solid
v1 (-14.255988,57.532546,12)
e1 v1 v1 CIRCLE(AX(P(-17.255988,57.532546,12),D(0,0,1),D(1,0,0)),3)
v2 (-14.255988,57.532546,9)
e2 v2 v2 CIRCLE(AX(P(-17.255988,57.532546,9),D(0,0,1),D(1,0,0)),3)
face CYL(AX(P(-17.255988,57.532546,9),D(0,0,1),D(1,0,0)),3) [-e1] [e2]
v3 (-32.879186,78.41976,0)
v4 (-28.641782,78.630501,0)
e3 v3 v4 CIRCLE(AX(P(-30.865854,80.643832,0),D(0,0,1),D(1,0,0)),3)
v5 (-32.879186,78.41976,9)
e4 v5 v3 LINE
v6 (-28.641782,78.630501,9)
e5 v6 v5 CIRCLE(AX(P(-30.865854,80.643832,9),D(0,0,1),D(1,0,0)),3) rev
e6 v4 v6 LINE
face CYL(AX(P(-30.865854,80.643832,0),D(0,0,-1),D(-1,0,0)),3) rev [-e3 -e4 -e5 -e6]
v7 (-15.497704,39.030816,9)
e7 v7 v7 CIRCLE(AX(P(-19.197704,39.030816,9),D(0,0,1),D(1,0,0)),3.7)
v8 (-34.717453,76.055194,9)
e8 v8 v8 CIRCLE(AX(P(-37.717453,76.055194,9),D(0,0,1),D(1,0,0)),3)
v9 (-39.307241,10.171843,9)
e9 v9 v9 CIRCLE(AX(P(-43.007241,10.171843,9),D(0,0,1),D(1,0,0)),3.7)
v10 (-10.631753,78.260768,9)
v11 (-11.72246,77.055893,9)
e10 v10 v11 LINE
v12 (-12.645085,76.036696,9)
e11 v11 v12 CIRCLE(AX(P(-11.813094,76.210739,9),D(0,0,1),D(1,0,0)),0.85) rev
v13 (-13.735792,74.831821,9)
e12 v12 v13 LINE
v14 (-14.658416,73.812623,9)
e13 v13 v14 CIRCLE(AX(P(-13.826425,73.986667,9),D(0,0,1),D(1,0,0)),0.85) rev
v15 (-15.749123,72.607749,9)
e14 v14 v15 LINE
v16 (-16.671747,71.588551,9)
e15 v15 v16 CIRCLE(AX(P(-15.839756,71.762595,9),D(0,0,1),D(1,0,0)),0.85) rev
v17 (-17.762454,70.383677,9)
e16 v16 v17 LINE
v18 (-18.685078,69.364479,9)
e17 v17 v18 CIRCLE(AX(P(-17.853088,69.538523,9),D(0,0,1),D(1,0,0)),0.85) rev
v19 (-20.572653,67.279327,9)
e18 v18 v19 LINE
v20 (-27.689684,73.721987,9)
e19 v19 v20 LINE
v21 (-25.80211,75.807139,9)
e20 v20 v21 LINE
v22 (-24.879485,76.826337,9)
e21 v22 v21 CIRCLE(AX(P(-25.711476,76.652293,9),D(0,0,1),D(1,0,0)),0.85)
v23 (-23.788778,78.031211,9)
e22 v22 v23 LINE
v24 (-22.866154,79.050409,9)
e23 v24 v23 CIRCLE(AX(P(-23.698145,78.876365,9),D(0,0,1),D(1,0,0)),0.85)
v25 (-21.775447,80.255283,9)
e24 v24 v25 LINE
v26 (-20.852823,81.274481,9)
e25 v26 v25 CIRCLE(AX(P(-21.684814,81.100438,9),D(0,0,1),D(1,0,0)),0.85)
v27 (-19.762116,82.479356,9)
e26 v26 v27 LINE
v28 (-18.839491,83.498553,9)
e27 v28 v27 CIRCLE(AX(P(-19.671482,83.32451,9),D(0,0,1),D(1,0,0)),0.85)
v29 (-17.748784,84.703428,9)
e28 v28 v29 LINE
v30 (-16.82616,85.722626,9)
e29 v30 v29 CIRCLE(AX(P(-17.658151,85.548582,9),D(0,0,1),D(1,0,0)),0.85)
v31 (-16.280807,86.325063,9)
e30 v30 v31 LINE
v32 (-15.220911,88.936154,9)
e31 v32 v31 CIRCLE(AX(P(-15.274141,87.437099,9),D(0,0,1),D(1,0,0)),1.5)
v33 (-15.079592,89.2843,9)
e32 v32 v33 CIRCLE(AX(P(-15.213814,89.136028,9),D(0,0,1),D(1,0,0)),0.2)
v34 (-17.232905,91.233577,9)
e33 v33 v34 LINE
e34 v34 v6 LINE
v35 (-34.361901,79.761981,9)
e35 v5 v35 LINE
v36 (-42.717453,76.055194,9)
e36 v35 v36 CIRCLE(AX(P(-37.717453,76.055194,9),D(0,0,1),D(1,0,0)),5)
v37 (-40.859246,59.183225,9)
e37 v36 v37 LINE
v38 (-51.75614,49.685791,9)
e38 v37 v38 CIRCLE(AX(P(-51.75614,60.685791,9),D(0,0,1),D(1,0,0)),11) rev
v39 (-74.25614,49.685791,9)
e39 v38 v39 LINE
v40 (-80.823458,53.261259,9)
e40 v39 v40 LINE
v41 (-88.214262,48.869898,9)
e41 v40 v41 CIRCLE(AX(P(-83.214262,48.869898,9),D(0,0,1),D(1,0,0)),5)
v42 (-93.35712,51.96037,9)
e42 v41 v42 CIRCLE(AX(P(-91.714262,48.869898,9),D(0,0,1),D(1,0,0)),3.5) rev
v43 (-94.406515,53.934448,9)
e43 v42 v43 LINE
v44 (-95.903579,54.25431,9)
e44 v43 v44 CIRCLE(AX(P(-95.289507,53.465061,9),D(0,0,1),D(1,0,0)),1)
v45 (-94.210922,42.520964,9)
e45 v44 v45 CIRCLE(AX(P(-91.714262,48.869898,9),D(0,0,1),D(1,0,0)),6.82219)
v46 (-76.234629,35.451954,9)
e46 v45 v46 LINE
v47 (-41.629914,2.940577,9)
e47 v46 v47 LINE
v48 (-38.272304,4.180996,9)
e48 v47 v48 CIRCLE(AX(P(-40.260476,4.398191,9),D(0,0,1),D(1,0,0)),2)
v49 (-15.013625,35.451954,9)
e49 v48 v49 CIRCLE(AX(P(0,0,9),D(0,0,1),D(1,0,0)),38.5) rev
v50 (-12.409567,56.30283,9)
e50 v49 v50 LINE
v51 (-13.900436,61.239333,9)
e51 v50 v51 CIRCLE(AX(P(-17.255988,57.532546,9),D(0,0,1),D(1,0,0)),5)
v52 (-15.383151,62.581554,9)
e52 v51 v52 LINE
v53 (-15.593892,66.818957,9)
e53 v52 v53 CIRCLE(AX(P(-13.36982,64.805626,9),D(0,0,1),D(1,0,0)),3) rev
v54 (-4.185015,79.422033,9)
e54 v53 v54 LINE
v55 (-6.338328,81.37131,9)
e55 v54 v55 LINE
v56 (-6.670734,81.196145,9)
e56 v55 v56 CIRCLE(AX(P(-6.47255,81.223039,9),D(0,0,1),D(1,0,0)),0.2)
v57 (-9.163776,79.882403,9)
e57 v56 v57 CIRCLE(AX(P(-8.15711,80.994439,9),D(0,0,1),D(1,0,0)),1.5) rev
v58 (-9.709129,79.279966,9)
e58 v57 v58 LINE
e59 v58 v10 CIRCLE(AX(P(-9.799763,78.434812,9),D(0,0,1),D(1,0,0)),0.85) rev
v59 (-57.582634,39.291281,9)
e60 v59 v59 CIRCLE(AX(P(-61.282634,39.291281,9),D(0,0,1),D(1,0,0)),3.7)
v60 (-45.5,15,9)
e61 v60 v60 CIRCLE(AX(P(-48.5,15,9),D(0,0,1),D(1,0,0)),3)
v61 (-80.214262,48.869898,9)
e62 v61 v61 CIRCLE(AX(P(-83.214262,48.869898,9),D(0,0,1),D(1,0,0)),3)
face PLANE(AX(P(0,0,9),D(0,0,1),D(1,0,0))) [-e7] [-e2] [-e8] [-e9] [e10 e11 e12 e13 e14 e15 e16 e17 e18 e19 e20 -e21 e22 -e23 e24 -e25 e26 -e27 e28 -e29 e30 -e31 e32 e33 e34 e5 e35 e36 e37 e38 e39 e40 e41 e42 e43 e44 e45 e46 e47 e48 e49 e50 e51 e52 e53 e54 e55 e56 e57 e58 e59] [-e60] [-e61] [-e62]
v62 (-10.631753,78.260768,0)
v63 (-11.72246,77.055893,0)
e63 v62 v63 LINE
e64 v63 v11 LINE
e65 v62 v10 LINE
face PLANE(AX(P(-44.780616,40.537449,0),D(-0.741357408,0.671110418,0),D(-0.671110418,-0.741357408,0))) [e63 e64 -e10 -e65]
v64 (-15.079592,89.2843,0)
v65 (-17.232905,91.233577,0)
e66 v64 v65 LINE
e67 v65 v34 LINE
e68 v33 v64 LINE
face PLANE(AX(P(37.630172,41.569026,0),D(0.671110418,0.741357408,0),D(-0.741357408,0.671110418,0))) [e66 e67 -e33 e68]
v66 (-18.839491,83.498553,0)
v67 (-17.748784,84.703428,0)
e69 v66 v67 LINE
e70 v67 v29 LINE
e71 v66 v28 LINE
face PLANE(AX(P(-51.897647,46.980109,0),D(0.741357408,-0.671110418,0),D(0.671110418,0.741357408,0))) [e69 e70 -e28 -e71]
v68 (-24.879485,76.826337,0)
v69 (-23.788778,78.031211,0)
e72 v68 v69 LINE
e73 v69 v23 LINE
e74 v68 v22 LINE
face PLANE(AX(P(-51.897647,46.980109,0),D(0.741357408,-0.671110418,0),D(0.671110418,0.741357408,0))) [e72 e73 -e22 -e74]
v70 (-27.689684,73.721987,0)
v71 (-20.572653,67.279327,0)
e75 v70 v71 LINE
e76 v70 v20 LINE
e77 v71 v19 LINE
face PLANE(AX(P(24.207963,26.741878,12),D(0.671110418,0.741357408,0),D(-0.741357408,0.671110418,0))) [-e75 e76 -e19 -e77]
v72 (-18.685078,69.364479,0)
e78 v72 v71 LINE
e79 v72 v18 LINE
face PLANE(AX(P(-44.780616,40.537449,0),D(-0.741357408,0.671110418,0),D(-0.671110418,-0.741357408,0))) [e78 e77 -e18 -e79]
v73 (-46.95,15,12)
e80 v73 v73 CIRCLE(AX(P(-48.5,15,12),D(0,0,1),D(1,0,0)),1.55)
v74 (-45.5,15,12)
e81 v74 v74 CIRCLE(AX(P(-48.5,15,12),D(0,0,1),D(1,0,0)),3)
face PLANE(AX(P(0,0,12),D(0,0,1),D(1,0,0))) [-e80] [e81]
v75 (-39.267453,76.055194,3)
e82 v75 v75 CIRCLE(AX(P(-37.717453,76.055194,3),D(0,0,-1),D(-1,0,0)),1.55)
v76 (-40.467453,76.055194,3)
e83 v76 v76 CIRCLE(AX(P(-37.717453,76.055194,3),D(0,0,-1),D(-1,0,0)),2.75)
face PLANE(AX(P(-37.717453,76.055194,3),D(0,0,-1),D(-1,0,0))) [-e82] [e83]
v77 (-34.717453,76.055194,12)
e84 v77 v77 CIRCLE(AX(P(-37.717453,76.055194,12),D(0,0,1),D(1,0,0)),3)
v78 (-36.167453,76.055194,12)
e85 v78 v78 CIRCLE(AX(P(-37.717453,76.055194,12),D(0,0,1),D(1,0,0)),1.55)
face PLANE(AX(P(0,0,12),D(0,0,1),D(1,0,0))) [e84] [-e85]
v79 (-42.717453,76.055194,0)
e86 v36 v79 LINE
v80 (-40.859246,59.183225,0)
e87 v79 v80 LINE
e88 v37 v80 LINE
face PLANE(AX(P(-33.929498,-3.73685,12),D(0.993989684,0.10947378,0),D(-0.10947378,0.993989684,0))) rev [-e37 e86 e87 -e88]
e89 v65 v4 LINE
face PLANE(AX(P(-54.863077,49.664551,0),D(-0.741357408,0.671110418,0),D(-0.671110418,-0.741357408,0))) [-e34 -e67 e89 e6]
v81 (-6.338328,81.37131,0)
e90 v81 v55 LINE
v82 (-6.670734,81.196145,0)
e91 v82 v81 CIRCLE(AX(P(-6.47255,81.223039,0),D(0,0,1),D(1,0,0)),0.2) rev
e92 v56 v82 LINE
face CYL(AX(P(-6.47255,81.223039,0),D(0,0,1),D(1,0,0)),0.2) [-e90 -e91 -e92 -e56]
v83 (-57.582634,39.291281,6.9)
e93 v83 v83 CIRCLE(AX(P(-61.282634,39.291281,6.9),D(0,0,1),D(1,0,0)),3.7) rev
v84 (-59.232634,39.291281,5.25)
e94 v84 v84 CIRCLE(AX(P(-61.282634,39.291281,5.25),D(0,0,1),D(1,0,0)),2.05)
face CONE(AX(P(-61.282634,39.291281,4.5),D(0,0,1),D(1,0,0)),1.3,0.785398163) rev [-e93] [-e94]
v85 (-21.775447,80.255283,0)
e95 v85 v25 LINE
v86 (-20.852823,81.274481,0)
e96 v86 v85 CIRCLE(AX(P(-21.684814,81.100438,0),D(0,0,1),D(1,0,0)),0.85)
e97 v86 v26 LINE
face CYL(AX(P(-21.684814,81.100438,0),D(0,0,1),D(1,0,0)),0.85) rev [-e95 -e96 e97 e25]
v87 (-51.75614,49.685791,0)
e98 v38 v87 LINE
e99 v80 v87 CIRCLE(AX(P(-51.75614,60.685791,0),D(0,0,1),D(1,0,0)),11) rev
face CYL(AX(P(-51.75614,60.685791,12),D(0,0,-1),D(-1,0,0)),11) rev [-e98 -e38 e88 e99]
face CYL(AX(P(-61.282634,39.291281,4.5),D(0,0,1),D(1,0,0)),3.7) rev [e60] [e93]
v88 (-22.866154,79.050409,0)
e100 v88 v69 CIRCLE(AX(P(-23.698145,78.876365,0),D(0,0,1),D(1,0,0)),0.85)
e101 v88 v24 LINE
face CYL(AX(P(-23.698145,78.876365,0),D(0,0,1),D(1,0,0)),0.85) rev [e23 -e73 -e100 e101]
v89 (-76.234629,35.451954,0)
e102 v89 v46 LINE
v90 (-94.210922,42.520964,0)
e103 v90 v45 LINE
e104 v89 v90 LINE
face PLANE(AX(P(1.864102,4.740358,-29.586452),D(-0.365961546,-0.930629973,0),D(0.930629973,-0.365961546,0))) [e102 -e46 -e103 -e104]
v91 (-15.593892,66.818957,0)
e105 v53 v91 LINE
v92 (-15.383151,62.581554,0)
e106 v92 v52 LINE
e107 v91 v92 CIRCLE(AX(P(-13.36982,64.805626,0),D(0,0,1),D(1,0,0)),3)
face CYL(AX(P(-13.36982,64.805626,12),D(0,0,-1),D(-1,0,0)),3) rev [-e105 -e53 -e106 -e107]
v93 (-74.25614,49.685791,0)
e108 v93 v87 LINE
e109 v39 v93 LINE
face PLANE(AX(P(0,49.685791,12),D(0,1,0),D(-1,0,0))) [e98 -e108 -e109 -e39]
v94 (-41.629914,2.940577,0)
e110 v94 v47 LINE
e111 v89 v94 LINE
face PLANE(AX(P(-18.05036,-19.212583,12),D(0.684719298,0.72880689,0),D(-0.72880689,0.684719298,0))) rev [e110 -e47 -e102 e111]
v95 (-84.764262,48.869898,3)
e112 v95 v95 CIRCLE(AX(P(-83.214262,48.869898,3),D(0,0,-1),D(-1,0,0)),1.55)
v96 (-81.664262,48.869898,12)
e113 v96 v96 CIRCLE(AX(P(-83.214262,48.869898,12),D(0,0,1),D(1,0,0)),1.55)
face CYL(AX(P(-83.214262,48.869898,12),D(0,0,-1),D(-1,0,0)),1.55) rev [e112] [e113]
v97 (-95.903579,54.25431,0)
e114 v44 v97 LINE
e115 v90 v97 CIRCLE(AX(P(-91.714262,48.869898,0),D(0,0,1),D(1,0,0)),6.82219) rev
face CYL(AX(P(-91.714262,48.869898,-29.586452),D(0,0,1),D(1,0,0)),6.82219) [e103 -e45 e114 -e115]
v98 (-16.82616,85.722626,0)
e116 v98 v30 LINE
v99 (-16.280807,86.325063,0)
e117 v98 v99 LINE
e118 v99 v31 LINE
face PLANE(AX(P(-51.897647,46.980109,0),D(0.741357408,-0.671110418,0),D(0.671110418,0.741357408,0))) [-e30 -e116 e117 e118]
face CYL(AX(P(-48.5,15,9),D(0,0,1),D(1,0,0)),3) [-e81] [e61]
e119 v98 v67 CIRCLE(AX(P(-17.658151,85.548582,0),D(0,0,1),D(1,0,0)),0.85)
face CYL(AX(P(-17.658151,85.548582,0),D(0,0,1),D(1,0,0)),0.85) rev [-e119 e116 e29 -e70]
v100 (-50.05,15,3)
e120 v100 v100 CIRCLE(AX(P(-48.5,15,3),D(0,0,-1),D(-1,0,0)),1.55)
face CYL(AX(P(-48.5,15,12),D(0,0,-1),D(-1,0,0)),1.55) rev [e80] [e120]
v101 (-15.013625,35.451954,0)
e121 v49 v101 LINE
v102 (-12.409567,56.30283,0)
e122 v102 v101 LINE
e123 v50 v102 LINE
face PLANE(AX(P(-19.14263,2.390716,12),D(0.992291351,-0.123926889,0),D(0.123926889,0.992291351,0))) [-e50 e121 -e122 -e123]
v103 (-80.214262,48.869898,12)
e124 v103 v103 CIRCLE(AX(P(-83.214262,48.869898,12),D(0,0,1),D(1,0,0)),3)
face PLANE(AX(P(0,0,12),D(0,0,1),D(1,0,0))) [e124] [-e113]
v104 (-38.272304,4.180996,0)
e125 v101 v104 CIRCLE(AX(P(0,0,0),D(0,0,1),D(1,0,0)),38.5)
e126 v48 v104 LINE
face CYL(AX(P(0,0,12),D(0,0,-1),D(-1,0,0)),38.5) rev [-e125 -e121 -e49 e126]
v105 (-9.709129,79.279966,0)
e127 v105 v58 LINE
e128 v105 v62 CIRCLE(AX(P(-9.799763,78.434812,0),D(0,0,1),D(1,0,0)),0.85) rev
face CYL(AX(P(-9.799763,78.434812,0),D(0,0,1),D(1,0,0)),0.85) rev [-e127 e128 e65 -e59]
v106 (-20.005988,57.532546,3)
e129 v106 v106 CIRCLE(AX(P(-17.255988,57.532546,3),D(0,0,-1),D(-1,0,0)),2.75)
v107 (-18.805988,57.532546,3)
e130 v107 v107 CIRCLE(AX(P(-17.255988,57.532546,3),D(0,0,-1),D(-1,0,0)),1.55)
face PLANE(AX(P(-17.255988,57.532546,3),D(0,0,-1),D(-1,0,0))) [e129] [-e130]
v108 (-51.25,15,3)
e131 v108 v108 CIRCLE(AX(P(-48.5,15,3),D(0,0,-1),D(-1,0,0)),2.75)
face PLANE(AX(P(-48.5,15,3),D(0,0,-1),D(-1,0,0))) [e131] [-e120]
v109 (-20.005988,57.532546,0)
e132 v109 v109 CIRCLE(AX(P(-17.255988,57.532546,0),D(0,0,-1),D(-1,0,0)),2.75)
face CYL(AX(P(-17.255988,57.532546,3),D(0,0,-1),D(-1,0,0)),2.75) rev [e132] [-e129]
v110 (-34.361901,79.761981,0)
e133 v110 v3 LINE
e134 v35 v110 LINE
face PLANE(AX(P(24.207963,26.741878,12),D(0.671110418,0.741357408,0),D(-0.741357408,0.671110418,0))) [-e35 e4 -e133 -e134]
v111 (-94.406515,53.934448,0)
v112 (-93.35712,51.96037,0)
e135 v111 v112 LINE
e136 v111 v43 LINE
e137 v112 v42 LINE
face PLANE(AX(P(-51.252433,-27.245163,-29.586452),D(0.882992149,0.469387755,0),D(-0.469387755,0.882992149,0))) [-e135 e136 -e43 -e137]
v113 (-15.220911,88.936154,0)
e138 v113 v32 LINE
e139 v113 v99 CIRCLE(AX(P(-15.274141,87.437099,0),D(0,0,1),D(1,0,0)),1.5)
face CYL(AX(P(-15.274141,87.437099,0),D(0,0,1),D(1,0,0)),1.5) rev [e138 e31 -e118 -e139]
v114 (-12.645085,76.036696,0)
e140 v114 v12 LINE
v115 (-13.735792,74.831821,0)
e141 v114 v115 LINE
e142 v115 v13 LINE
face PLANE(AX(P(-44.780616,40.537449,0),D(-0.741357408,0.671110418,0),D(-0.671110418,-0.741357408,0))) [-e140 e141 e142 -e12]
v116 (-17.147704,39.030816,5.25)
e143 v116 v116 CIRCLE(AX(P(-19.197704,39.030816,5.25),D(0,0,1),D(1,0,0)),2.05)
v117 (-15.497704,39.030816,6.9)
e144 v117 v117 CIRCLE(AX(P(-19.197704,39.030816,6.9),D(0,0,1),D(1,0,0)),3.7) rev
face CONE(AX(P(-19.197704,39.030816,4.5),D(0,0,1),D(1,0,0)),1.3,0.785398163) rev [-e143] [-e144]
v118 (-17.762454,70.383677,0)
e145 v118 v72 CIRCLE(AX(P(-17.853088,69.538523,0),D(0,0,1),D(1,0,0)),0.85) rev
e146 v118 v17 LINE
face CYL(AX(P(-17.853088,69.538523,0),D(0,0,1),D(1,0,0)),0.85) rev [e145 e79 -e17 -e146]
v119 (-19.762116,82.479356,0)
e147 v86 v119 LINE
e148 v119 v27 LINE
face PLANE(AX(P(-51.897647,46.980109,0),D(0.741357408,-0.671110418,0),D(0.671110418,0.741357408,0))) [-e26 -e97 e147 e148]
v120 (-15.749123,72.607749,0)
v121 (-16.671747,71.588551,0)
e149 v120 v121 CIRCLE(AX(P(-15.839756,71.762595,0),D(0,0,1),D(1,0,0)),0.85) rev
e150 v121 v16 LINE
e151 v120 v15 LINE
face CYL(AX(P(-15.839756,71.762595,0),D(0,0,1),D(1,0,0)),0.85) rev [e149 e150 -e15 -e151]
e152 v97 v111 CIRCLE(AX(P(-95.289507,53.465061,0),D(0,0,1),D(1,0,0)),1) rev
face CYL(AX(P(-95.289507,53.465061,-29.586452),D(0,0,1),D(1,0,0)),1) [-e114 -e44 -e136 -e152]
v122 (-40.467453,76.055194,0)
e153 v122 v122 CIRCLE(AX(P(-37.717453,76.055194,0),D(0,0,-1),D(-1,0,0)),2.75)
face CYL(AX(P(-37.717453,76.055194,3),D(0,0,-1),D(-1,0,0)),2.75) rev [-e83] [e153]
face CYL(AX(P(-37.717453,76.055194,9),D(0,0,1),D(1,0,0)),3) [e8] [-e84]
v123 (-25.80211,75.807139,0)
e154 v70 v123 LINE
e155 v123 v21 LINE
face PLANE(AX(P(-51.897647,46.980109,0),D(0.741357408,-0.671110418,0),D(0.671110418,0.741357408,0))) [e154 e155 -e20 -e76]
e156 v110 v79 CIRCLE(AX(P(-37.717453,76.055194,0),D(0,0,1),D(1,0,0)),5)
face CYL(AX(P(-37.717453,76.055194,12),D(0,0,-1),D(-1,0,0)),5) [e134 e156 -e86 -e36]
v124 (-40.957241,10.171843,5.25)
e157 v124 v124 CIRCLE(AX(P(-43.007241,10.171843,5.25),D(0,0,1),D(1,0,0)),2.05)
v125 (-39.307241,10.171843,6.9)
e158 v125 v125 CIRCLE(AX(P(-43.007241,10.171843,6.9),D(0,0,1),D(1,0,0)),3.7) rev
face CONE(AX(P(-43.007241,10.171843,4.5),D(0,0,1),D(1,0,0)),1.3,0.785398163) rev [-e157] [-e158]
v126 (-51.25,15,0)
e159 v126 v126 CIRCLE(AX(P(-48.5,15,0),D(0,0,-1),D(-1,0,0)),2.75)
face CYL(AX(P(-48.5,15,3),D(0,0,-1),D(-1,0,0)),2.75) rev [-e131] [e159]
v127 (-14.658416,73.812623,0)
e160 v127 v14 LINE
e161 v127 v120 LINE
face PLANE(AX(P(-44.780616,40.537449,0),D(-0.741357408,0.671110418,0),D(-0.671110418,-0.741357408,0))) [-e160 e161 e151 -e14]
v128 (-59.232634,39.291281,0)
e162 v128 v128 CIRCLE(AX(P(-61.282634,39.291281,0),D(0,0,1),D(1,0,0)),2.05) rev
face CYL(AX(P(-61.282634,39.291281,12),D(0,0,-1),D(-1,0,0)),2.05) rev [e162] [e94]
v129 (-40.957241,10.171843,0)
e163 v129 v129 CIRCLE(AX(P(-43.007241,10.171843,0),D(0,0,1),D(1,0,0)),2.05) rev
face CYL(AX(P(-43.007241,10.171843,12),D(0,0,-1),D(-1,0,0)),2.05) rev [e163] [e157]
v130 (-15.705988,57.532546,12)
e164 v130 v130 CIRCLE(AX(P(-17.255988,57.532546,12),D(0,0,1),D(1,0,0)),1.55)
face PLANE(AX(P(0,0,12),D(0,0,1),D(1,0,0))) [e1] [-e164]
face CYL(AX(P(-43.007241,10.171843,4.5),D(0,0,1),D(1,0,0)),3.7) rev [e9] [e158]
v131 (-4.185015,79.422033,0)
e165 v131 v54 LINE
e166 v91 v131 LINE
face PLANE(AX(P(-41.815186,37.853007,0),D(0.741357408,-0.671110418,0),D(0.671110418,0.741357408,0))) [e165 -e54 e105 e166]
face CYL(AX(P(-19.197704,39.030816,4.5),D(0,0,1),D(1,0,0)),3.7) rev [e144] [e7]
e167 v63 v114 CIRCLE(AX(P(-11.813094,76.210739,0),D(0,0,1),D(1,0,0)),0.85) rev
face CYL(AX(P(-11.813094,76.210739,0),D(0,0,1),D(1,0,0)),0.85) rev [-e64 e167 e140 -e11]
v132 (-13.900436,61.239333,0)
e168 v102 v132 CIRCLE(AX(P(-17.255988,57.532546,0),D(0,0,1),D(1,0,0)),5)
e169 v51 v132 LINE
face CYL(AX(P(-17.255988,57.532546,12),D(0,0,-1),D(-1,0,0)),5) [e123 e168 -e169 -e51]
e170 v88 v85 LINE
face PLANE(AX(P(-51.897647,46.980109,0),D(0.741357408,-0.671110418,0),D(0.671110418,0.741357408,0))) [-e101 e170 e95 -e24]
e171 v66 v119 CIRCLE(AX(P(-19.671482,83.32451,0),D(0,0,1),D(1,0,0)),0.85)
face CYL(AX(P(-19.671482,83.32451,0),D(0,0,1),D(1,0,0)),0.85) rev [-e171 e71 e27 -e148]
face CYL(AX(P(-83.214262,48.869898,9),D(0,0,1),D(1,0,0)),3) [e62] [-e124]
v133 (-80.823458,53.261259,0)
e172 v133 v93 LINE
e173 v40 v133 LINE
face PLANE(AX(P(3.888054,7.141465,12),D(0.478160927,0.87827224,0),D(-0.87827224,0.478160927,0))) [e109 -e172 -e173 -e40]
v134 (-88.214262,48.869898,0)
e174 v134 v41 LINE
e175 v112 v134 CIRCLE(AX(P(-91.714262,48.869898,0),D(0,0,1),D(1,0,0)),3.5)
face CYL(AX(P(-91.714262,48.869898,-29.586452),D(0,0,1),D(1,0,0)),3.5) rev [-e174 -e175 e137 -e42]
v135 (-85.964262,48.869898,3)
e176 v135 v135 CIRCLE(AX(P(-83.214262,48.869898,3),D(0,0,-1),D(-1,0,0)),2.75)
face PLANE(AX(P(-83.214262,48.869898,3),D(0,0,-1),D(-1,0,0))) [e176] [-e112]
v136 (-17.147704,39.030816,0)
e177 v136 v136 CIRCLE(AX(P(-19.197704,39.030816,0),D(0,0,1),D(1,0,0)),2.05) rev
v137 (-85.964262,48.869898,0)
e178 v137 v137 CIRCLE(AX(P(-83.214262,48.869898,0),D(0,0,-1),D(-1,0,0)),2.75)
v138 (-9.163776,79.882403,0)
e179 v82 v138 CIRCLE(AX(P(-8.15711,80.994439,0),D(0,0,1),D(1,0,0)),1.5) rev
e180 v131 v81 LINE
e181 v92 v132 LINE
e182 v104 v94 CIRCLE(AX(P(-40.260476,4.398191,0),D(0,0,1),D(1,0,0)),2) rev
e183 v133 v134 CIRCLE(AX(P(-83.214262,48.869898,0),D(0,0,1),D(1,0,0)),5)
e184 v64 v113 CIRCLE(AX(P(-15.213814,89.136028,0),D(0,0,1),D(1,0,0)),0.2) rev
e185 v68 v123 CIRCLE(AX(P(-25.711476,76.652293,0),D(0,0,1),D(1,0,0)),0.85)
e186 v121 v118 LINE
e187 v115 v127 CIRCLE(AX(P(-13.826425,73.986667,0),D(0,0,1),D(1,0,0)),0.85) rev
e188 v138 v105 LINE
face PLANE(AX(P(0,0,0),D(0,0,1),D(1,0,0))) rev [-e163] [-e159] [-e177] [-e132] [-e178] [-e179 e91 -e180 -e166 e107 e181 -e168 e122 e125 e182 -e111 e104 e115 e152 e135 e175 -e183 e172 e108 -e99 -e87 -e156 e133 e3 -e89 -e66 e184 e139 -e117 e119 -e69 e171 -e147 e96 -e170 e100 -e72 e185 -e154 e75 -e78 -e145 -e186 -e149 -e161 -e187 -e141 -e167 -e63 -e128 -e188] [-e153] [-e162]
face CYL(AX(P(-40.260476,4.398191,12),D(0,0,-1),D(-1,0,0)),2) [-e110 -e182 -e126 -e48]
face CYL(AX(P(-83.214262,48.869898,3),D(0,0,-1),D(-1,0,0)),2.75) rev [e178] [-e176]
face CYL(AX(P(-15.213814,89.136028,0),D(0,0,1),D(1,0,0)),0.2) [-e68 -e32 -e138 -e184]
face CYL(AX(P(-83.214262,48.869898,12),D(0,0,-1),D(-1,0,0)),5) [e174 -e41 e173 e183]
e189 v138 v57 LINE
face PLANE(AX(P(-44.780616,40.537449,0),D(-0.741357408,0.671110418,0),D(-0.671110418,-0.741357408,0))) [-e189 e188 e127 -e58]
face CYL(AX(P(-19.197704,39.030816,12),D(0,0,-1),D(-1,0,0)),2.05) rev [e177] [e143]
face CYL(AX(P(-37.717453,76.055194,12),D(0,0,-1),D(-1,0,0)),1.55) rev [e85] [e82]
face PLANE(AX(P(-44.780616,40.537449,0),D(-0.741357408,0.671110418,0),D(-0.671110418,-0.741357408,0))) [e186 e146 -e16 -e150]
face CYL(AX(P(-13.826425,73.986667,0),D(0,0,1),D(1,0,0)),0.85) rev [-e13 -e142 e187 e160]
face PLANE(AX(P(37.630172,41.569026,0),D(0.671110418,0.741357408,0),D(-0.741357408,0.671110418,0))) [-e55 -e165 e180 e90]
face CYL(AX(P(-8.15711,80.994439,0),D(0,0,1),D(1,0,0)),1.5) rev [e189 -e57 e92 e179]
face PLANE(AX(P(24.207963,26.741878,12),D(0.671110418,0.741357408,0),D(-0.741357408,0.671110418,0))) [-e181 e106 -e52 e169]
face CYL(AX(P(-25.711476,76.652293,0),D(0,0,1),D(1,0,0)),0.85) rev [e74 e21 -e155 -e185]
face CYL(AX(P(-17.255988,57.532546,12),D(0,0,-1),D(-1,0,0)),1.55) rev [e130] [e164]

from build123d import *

# Parameters (mm, degrees)
SKETCH2_R           = 1.55
SKETCH2_R_2         = 2.05
BOSS_EXTRUDE1_DEPTH = 12
FILLET1_R           = 2
CUT_EXTRUDE1_START  = -3
SKETCH3_R           = 3
SKETCH3_R_2         = 2.05
CUT_EXTRUDE1_DEPTH  = 3
SKETCH4_R           = 3.7
CUT_EXTRUDE2_DEPTH  = 4.5
CHAMFER1_SIZE       = 2.4
SKETCH5_R           = 2.75
CUT_EXTRUDE3_DEPTH  = 3
BOSS_EXTRUDE2_START = -9
BOSS_EXTRUDE2_DEPTH = 9
FILLET2_R           = 1
BOSS_EXTRUDE3_DEPTH = 9
FILLET4_START       = -1
FILLET4_DEPTH       = 11
FILLET5_R           = 3


with BuildPart() as part:
    # Sketch2 → Boss-Extrude1 (new body)
    with BuildSketch(Plane.XY):
        with BuildLine():
            ThreePointArc((-34.361900506, 79.761980688), (-39.745042243, 80.625629102), (-42.717452598, 76.055193649))
            Line((-42.717452598, 76.055193649), (-40.859246047, 59.183225371))
            ThreePointArc((-40.859246047, 59.183225371), (-44.528699852, 52.393377917), (-51.756139987, 49.685790659))
            Line((-51.756139987, 49.685790659), (-74.256139987, 49.685790659))
            Line((-74.256139987, 49.685790659), (-80.823457728, 53.261259171))
            ThreePointArc((-80.823457728, 53.261259171), (-87.265010513, 51.801013702), (-86.637858855, 45.225863521))
            Line((-86.637858855, 45.225863521), (-38.5, 0))
            ThreePointArc((-38.5, 0), (-32.095751713, 21.262942459), (-15.013624831, 35.451954381))
            Line((-15.013624831, 35.451954381), (-12.409566879, 56.302830298))
            ThreePointArc((-12.409566879, 56.302830298), (-12.469511691, 58.978105921), (-13.900436048, 61.239333138))
            Line((-13.900436048, 61.239333138), (-34.361900506, 79.761980688))
        make_face()
        with Locations((-37.717452598, 76.055193649)):
            Circle(SKETCH2_R, mode=Mode.SUBTRACT)
        with Locations((-19.197703686, 39.030816229)):
            Circle(SKETCH2_R_2, mode=Mode.SUBTRACT)
        with Locations((-43.007240778, 10.171842851)):
            Circle(SKETCH2_R_2, mode=Mode.SUBTRACT)
        with Locations((-48.5, 15)):
            Circle(SKETCH2_R, mode=Mode.SUBTRACT)
        with Locations((-61.282634195, 39.291280842)):
            Circle(SKETCH2_R_2, mode=Mode.SUBTRACT)
        with Locations((-17.255988141, 57.532546099)):
            Circle(SKETCH2_R, mode=Mode.SUBTRACT)
        with Locations((-83.214262364, 48.86989797)):
            Circle(SKETCH2_R, mode=Mode.SUBTRACT)
    extrude(amount=BOSS_EXTRUDE1_DEPTH)

    # Fillet1
    fillet1_edges = [part.edges().sort_by_distance(p)[0] for p in [
        (-38.5, 0, 6),
    ]]
    fillet(fillet1_edges, radius=FILLET1_R)

    # Sketch3 → Cut-Extrude1 (cut)
    with BuildSketch(Plane.XY.offset(12).offset(CUT_EXTRUDE1_START)):
        with BuildLine():
            ThreePointArc((-80.823457728, 53.261259171), (-87.265010513, 51.801013702), (-86.637858855, 45.225863521))
            Line((-86.637858855, 45.225863521), (-41.629914465, 2.94057708))
            ThreePointArc((-41.629914465, 2.94057708), (-39.567390321, 2.522122518), (-38.272304221, 4.180996249))
            ThreePointArc((-38.272304221, 4.180996249), (-30.892001624, 22.976819529), (-15.013624831, 35.451954381))
            Line((-15.013624831, 35.451954381), (-12.409566879, 56.302830298))
            ThreePointArc((-12.409566879, 56.302830298), (-12.469511691, 58.978105921), (-13.900436048, 61.239333138))
            Line((-13.900436048, 61.239333138), (-34.361900506, 79.761980688))
            ThreePointArc((-34.361900506, 79.761980688), (-39.745042243, 80.625629102), (-42.717452598, 76.055193649))
            Line((-42.717452598, 76.055193649), (-40.859246047, 59.183225371))
            ThreePointArc((-40.859246047, 59.183225371), (-44.528699852, 52.393377917), (-51.756139987, 49.685790659))
            Line((-51.756139987, 49.685790659), (-74.256139987, 49.685790659))
            Line((-74.256139987, 49.685790659), (-80.823457728, 53.261259171))
        make_face()
        with Locations((-83.214262364, 48.86989797)):
            Circle(SKETCH3_R, mode=Mode.SUBTRACT)
        with Locations((-48.5, 15)):
            Circle(SKETCH3_R, mode=Mode.SUBTRACT)
        with Locations((-37.717452598, 76.055193649)):
            Circle(SKETCH3_R, mode=Mode.SUBTRACT)
        with Locations((-17.255988141, 57.532546099)):
            Circle(SKETCH3_R, mode=Mode.SUBTRACT)
        with Locations((-19.197703686, 39.030816229)):
            Circle(SKETCH3_R_2, mode=Mode.SUBTRACT)
        with Locations((-61.282634195, 39.291280842)):
            Circle(SKETCH3_R_2, mode=Mode.SUBTRACT)
        with Locations((-43.007240778, 10.171842851)):
            Circle(SKETCH3_R_2, mode=Mode.SUBTRACT)
    extrude(amount=CUT_EXTRUDE1_DEPTH, mode=Mode.SUBTRACT)

    # Sketch4 → Cut-Extrude2 (cut)
    with BuildSketch(Plane.XY.offset(9)):
        with Locations((-19.197703686, 39.030816229)):
            Circle(SKETCH4_R)
        with Locations((-61.282634195, 39.291280842)):
            Circle(SKETCH4_R)
        with Locations((-43.007240778, 10.171842851)):
            Circle(SKETCH4_R)
    extrude(amount=-CUT_EXTRUDE2_DEPTH, mode=Mode.SUBTRACT)

    # Chamfer1
    # the kernel refuses this chamfer: 2.4 mm, written as the material it adds along each edge
    with BuildSketch(Plane(origin=(-19.197703686, 39.030816229, 4.5), x_dir=(1, 0, 0), z_dir=(0, -1, 0))) as chamfer1_piece_1_section:
        Polygon((3.7, CHAMFER1_SIZE), (3.7 - CHAMFER1_SIZE, 0), (3.7, 0), align=None)
    chamfer1_piece_1 = revolve(axis=Axis((-19.197703686, 39.030816229, 4.5), (0, 0, 1)), mode=Mode.PRIVATE)
    chamfer1_piece_1 = chamfer1_piece_1 - Plane(origin=(-19.197703686, 39.030816229, 4.5), x_dir=(1, 0, 0), z_dir=(0, 0, -1)) * Cylinder(2.05, 15, mode=Mode.PRIVATE)
    add(chamfer1_piece_1)
    with BuildSketch(Plane(origin=(-61.282634195, 39.291280842, 4.5), x_dir=(1, 0, 0), z_dir=(0, -1, 0))) as chamfer1_piece_2_section:
        Polygon((3.7, CHAMFER1_SIZE), (3.7 - CHAMFER1_SIZE, 0), (3.7, 0), align=None)
    chamfer1_piece_2 = revolve(axis=Axis((-61.282634195, 39.291280842, 4.5), (0, 0, 1)), mode=Mode.PRIVATE)
    chamfer1_piece_2 = chamfer1_piece_2 - Plane(origin=(-61.282634195, 39.291280842, 4.5), x_dir=(1, 0, 0), z_dir=(0, 0, -1)) * Cylinder(2.05, 15, mode=Mode.PRIVATE)
    add(chamfer1_piece_2)
    with BuildSketch(Plane(origin=(-43.007240778, 10.171842851, 4.5), x_dir=(1, 0, 0), z_dir=(0, -1, 0))) as chamfer1_piece_3_section:
        Polygon((3.7, CHAMFER1_SIZE), (3.7 - CHAMFER1_SIZE, 0), (3.7, 0), align=None)
    chamfer1_piece_3 = revolve(axis=Axis((-43.007240778, 10.171842851, 4.5), (0, 0, 1)), mode=Mode.PRIVATE)
    chamfer1_piece_3 = chamfer1_piece_3 - Plane(origin=(-43.007240778, 10.171842851, 4.5), x_dir=(1, 0, 0), z_dir=(0, 0, -1)) * Cylinder(2.05, 15, mode=Mode.PRIVATE)
    add(chamfer1_piece_3)

    # Sketch5 → Cut-Extrude3 (cut)
    with BuildSketch(Plane(origin=(0, 0, 0), x_dir=(-1, 0, 0), z_dir=(0, 0, -1))):
        with Locations((37.717452598, 76.055193649)):
            Circle(SKETCH5_R)
        with Locations((83.214262364, 48.86989797)):
            Circle(SKETCH5_R)
        with Locations((17.255988141, 57.532546099)):
            Circle(SKETCH5_R)
        with Locations((48.5, 15)):
            Circle(SKETCH5_R)
    extrude(amount=-CUT_EXTRUDE3_DEPTH, mode=Mode.SUBTRACT)

    # Sketch6 → Boss-Extrude2 (add)
    with BuildSketch(Plane.XY.offset(9).offset(BOSS_EXTRUDE2_START)):
        with BuildLine():
            ThreePointArc((-88.214262364, 48.86989797), (-93.517038002, 45.86989797), (-93.357119507, 51.960370492))
            Line((-93.357119507, 51.960370492), (-94.916514756, 54.893838074))
            ThreePointArc((-94.916514756, 54.893838074), (-98.525385911, 48.481477098), (-94.210921521, 42.520963587))
            ThreePointArc((-94.210921521, 42.520963587), (-89.820992141, 42.315677756), (-86.216712067, 44.830193095))
            Line((-86.216712067, 44.830193095), (-86.637858855, 45.225863521))
            ThreePointArc((-86.637858855, 45.225863521), (-87.803270016, 46.884700557), (-88.214262364, 48.86989797))
        make_face()
        with BuildLine():
            ThreePointArc((-86.216712067, 44.830193095), (-89.820992141, 42.315677756), (-94.210921521, 42.520963587))
            Line((-94.210921521, 42.520963587), (-76.234628888, 35.451954381))
            Line((-76.234628888, 35.451954381), (-86.216712067, 44.830193095))
        make_face()
    extrude(amount=BOSS_EXTRUDE2_DEPTH)

    # Fillet2
    fillet2_edges = [part.edges().sort_by_distance(p)[0] for p in [
        (-94.916514756, 54.893838074, 4.5),
    ]]
    fillet(fillet2_edges, radius=FILLET2_R)

    # Sketch7 → Boss-Extrude3 (add)
    with BuildSketch(Plane.XY.offset(9)):
        with BuildLine():
            Line((-20.572652719, 67.279326905), (-17.607223088, 64.594885231))
            Line((-17.607223088, 64.594885231), (-4.185014718, 79.422033388))
            Line((-4.185014718, 79.422033388), (-7.15044435, 82.106475062))
            ThreePointArc((-7.15044435, 82.106475062), (-7.045073866, 79.987773323), (-9.163775605, 79.882402839))
            Line((-9.163775605, 79.882402839), (-9.709129089, 79.279965693))
            ThreePointArc((-9.709129089, 79.279965693), (-9.169608732, 77.864367662), (-10.631753377, 78.260767761))
            Line((-10.631753377, 78.260767761), (-11.722460344, 77.055893469))
            ThreePointArc((-11.722460344, 77.055893469), (-11.182939988, 75.640295438), (-12.645084632, 76.036695537))
            Line((-12.645084632, 76.036695537), (-13.7357916, 74.831821245))
            ThreePointArc((-13.7357916, 74.831821245), (-13.196271243, 73.416223215), (-14.658415888, 73.812623314))
            Line((-14.658415888, 73.812623314), (-15.749122855, 72.607749022))
            ThreePointArc((-15.749122855, 72.607749022), (-15.209602499, 71.192150991), (-16.671747143, 71.58855109))
            Line((-16.671747143, 71.58855109), (-17.762454111, 70.383676798))
            ThreePointArc((-17.762454111, 70.383676798), (-17.222933754, 68.968078767), (-18.685078398, 69.364478866))
            Line((-18.685078398, 69.364478866), (-20.572652719, 67.279326905))
        make_face()
        with BuildLine():
            Line((-16.826160205, 85.72262571), (-16.280806721, 86.325062856))
            ThreePointArc((-16.280806721, 86.325062856), (-16.386177205, 88.443764595), (-14.267475465, 88.54913508))
            Line((-14.267475465, 88.54913508), (-17.232905097, 91.233576753))
            Line((-17.232905097, 91.233576753), (-30.655113466, 76.406428596))
            Line((-30.655113466, 76.406428596), (-27.689683835, 73.721986922))
            Line((-27.689683835, 73.721986922), (-25.802109514, 75.807138884))
            ThreePointArc((-25.802109514, 75.807138884), (-26.341629871, 77.222736915), (-24.879485226, 76.826336815))
            Line((-24.879485226, 76.826336815), (-23.788778259, 78.031211107))
            ThreePointArc((-23.788778259, 78.031211107), (-24.328298615, 79.446809138), (-22.866153971, 79.050409039))
            Line((-22.866153971, 79.050409039), (-21.775447003, 80.255283331))
            ThreePointArc((-21.775447003, 80.255283331), (-22.31496736, 81.670881362), (-20.852822715, 81.274481263))
            Line((-20.852822715, 81.274481263), (-19.762115748, 82.479355555))
            ThreePointArc((-19.762115748, 82.479355555), (-20.301636104, 83.894953585), (-18.83949146, 83.498553486))
            Line((-18.83949146, 83.498553486), (-17.748784492, 84.703427778))
            ThreePointArc((-17.748784492, 84.703427778), (-18.288304849, 86.119025809), (-16.826160205, 85.72262571))
        make_face()
    extrude(amount=-BOSS_EXTRUDE3_DEPTH)

    # Fillet4: read off the stored shape, not the designer's step
    # Fillet4 outline → Fillet4 (cut)
    with BuildSketch(Plane.XY.offset(FILLET4_START)):
        with BuildLine():
            ThreePointArc((-6.670733599, 81.196144833), (-6.565789093, 81.399975343), (-6.338327999, 81.371310433))
            Line((-6.338327999, 81.371310433), (-7.15044435, 82.106475062))
            ThreePointArc((-7.15044435, 82.106475062), (-6.830087034, 81.693731527), (-6.670733599, 81.196144833))
        make_face()
        with BuildLine():
            ThreePointArc((-15.079591816, 89.284299709), (-15.0284993, 89.060805232), (-15.220911217, 88.936154197))
            ThreePointArc((-15.220911217, 88.936154197), (-14.709968629, 88.826958469), (-14.267475465, 88.54913508))
            Line((-14.267475465, 88.54913508), (-15.079591816, 89.284299709))
        make_face()
    extrude(amount=FILLET4_DEPTH, mode=Mode.SUBTRACT)

    # Fillet5
    fillet5_edges = [part.edges().sort_by_distance(p)[0] for p in [
        (-17.607223088, 64.594885231, 4.5),
        (-30.655113466, 76.406428596, 4.5),
    ]]
    fillet(fillet5_edges, radius=FILLET5_R)


solid = part.part
